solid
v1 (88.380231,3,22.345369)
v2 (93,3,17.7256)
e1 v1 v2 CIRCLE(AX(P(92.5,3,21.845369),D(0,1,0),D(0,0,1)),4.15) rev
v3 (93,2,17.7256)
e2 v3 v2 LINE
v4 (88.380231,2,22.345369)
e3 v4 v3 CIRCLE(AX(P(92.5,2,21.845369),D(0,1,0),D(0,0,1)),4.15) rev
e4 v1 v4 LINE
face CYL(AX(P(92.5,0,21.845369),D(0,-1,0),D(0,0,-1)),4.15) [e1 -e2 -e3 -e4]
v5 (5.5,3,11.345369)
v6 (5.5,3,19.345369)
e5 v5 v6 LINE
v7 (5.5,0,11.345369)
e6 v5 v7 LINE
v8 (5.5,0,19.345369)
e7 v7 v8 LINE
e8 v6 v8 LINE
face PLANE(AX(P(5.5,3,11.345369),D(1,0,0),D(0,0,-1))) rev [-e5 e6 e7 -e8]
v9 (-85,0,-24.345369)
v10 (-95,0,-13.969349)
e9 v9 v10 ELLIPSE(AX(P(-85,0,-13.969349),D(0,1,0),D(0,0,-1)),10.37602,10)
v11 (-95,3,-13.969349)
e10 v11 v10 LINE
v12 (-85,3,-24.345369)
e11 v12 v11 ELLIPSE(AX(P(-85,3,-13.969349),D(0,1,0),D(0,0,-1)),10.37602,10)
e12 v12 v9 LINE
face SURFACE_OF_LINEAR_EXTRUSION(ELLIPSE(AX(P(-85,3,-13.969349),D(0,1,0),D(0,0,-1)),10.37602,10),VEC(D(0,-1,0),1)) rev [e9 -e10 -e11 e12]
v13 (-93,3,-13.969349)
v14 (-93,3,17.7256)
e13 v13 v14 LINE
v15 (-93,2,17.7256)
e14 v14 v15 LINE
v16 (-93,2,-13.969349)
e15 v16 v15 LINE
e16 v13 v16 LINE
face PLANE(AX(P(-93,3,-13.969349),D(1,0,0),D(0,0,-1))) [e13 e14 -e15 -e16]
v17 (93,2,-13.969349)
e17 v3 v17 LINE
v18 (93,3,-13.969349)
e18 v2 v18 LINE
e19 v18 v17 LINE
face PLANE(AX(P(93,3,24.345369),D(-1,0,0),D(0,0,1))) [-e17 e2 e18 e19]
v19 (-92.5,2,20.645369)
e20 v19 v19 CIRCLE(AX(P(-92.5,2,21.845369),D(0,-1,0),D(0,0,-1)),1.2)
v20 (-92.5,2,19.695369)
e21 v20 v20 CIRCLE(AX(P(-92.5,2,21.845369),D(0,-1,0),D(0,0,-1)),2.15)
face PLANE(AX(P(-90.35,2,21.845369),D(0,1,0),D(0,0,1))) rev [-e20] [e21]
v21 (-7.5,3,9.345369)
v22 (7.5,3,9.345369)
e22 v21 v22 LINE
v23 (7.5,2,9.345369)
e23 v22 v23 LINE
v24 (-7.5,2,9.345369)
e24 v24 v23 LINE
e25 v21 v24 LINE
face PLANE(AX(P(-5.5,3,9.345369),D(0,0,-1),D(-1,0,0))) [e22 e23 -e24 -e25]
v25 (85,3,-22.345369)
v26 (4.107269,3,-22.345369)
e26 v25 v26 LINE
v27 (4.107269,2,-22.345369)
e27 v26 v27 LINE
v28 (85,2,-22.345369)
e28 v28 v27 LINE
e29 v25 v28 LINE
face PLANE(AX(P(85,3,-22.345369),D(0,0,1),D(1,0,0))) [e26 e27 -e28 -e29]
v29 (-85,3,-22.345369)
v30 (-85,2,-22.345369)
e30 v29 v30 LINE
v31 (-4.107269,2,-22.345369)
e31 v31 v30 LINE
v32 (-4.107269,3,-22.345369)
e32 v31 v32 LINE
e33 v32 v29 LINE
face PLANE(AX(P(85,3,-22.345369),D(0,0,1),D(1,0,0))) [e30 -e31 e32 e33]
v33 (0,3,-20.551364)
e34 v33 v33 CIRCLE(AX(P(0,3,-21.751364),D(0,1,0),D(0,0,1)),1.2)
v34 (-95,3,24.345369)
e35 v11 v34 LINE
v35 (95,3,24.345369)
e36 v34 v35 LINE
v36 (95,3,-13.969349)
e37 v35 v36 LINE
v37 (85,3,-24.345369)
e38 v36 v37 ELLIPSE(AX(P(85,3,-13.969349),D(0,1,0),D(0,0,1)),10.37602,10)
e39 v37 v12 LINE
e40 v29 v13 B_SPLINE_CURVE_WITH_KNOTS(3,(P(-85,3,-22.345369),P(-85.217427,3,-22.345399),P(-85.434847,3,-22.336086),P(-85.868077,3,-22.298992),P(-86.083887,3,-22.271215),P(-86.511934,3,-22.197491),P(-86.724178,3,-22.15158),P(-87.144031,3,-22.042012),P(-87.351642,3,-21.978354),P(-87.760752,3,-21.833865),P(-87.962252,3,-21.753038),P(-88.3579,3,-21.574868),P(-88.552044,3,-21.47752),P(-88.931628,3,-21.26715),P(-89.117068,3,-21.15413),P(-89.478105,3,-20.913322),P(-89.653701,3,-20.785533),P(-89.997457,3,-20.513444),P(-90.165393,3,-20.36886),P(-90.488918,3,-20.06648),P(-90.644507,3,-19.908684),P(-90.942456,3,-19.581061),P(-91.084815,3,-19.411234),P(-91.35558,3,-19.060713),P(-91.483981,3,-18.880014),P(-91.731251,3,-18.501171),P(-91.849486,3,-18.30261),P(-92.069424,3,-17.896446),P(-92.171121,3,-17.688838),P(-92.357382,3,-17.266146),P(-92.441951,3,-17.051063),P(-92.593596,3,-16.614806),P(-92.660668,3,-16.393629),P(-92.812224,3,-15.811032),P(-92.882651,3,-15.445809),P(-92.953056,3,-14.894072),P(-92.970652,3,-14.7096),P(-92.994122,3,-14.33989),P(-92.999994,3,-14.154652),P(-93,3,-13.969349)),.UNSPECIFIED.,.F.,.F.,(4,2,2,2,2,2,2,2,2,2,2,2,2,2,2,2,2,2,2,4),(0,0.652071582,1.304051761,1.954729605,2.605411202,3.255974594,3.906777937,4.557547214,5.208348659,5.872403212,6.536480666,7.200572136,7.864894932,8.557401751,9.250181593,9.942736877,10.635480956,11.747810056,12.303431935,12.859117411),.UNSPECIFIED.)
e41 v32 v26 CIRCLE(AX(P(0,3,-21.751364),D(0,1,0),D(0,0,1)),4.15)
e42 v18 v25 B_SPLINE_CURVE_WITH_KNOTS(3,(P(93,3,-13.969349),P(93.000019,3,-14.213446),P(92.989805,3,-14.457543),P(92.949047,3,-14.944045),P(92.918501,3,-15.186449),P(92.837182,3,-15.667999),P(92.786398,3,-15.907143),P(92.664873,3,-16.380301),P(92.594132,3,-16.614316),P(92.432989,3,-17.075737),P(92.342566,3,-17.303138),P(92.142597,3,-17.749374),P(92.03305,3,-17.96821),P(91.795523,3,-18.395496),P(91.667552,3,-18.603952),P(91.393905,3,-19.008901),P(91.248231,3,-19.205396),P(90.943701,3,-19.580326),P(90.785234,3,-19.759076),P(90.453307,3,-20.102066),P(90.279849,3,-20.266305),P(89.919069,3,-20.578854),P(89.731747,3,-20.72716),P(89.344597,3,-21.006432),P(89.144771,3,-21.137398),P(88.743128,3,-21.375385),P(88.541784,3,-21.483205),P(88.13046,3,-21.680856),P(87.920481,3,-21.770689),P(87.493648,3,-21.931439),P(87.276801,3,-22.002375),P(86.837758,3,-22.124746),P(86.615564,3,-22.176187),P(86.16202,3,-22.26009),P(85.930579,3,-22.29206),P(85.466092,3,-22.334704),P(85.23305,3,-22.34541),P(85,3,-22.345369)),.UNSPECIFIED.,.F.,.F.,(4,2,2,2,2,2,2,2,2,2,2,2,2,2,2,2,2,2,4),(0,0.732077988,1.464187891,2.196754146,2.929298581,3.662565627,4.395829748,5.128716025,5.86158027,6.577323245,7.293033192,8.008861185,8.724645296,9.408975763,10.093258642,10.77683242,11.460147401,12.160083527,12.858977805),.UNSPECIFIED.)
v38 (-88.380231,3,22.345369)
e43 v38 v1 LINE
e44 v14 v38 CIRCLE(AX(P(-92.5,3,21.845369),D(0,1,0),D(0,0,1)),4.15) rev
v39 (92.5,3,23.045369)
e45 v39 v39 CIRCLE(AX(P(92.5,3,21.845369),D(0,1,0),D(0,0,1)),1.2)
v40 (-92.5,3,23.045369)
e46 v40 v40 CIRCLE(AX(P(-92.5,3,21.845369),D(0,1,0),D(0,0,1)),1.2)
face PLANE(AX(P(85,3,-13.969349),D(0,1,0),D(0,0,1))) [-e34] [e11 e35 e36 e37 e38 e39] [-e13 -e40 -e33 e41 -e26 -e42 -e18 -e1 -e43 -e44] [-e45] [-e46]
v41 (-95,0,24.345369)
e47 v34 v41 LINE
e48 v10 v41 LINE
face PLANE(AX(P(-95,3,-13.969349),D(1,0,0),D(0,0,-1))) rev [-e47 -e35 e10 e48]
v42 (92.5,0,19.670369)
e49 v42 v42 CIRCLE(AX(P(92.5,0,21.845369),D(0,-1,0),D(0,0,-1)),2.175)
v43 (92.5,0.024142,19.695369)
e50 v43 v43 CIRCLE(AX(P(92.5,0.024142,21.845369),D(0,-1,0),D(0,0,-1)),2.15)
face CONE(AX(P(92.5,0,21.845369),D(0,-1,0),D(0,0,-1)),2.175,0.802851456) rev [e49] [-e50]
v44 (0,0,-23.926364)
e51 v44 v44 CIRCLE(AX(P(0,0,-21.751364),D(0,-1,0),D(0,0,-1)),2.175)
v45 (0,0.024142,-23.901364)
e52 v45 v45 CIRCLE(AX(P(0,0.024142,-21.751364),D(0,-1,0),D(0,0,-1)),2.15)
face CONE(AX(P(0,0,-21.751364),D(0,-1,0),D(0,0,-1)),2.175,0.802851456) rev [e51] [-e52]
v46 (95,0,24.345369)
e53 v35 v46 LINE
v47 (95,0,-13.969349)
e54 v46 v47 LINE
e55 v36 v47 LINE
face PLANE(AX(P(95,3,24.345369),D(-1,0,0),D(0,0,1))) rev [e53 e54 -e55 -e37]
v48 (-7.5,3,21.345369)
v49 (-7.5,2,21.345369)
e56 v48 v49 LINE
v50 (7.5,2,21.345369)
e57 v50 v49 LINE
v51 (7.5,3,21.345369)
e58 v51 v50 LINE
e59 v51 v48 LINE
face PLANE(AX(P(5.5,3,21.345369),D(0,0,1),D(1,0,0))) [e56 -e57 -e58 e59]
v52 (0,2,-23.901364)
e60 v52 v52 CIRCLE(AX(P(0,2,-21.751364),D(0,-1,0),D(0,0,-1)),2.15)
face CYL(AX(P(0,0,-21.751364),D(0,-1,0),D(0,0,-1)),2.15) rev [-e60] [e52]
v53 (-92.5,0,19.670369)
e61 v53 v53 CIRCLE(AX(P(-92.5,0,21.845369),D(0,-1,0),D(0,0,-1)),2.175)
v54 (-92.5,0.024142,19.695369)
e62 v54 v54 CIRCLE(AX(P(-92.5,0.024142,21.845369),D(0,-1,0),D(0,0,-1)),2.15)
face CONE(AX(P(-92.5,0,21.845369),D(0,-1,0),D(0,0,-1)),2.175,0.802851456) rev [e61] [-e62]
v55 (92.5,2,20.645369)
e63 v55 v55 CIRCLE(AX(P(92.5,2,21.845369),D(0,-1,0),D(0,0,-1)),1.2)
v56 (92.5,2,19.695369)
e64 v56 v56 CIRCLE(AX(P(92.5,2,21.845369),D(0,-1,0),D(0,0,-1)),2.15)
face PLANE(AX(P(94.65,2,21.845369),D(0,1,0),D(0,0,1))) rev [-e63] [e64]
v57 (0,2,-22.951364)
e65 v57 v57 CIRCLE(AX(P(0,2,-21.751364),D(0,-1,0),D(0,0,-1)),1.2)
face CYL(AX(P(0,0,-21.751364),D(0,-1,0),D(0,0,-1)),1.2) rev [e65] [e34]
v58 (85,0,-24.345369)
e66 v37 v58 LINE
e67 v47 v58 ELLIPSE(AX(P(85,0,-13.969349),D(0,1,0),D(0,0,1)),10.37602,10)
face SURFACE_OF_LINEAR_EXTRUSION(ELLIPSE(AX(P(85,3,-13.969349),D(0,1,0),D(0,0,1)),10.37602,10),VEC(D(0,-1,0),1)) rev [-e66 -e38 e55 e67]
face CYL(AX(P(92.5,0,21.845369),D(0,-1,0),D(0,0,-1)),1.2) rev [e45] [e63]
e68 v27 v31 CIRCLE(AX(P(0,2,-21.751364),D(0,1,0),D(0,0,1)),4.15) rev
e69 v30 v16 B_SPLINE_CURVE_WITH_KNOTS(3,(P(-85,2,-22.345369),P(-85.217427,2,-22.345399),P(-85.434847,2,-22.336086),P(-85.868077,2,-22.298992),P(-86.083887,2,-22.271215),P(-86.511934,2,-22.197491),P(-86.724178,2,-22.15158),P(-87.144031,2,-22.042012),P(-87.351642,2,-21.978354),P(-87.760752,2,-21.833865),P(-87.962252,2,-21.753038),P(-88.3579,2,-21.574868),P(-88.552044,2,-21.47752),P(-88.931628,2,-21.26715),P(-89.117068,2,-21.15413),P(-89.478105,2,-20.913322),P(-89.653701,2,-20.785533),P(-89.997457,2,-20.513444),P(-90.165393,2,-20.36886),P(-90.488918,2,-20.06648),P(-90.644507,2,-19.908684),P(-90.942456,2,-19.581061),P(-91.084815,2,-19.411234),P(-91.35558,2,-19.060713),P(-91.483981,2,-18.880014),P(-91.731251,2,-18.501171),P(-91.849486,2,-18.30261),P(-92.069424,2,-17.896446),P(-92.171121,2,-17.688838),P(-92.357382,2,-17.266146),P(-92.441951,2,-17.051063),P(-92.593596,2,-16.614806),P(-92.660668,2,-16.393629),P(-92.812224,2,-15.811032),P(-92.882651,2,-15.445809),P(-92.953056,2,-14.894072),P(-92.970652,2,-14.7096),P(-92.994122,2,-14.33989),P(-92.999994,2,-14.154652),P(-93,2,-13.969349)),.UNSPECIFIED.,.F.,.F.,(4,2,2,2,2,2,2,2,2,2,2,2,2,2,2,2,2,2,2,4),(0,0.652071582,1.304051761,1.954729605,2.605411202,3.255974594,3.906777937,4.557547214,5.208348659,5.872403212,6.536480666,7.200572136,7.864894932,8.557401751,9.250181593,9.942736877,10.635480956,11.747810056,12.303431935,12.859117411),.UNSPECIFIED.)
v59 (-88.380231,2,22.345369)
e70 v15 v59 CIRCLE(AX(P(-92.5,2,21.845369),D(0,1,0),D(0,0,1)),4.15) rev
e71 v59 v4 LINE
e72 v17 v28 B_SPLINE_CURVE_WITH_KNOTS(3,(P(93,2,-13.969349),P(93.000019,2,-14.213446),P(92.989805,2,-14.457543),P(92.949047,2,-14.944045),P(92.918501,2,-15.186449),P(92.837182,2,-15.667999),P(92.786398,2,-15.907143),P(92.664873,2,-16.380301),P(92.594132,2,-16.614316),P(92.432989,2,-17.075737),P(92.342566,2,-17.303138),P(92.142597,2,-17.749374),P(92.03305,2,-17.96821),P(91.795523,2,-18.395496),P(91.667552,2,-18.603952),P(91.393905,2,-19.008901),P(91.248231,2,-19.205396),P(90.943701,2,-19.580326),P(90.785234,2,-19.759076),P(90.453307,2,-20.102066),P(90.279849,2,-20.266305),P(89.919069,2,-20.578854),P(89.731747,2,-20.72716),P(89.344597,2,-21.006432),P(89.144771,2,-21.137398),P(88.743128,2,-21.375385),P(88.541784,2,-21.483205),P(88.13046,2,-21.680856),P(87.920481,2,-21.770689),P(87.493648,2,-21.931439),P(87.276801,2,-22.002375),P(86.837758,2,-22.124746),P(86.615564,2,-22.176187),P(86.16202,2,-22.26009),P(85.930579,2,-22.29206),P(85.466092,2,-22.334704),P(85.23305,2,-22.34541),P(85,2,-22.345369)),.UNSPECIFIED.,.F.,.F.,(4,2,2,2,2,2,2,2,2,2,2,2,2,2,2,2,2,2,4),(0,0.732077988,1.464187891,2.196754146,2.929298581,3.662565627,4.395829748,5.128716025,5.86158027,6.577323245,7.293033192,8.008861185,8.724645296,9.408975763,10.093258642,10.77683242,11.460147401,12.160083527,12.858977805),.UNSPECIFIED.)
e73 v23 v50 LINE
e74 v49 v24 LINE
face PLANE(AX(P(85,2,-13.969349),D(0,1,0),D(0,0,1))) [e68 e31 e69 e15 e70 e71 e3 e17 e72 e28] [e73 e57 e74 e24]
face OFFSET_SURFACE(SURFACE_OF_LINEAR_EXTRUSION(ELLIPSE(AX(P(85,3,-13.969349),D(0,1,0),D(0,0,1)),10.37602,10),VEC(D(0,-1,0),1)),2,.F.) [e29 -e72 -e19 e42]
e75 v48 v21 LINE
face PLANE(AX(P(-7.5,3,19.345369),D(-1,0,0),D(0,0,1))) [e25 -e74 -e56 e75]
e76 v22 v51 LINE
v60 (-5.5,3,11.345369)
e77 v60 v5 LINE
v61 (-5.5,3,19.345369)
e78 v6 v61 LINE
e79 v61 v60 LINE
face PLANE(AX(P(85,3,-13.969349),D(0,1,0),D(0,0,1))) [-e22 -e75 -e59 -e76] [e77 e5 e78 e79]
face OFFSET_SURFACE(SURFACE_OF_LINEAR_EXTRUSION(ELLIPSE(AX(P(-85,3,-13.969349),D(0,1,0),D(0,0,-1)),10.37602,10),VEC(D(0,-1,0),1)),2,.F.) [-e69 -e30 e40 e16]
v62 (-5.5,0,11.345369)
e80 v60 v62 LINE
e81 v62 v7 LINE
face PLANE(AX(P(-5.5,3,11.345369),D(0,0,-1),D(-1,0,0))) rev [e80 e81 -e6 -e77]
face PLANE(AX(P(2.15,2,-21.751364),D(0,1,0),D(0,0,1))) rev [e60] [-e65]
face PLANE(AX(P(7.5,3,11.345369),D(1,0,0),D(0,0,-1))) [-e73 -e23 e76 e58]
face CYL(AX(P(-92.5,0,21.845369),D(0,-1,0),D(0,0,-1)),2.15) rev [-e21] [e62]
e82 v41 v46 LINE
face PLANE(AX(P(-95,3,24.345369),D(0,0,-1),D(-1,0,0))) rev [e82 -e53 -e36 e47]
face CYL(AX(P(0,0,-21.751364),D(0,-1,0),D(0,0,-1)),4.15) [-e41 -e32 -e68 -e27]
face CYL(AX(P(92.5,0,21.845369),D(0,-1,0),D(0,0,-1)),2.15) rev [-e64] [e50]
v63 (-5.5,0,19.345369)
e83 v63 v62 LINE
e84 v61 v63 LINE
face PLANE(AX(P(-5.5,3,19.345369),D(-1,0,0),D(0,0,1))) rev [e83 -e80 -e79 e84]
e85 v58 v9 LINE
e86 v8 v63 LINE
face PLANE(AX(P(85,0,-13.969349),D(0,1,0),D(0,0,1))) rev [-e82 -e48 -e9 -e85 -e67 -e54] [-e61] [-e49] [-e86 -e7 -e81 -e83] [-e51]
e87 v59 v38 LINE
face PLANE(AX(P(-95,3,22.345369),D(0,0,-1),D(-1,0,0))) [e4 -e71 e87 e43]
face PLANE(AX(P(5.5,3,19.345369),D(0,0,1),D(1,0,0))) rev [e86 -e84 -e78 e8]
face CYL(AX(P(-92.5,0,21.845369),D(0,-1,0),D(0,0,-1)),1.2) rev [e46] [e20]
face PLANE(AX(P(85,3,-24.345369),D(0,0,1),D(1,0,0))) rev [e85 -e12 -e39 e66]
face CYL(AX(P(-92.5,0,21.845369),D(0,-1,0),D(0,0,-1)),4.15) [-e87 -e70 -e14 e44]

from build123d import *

# Parameters (mm, degrees)
EXTRUDE_2_DEPTH          = 3
HOLE_WIZARD_6_AT_2_COUNT = 2
HOLE_WIZARD_6_AT_2_PITCH = 102.259107828
HOLE_WIZARD_6_AT_3_COUNT = 2
HOLE_WIZARD_6_AT_3_PITCH = 185
SKETCH_15_W              = 11
SKETCH_15_H              = 8
CUT_EXTRUDE_1_DEPTH      = 99.115732766
SHELL_START              = 2
SHELL_3_OUTLINE_W        = 15
SHELL_3_OUTLINE_H        = 12
SHELL_3_DEPTH            = 1


# Read off the part's stored shape, not the designer's step: 抽壳3
with BuildPart() as part:
    # 草图1 → 凸台-拉伸2 (new body)
    with BuildSketch(Plane(origin=(0, 0, 0), x_dir=(1, 0, 0), z_dir=(0, 1, 0))):
        with BuildLine():
            Line((85, 24.345368999), (-85, 24.345368999))
            add(Edge.make_bspline(
                [(-85, 24.345368999), (-95, 24.345368999), (-95, 13.969349259)],
                knots=[0, 0, 0, 1.570796327, 1.570796327, 1.570796327], degree=2, weights=[1, 0.707106781, 1]))
            Line((-95, 13.969349259), (-95, -24.345368999))
            Line((-95, -24.345368999), (95, -24.345368999))
            Line((95, -24.345368999), (95, 13.969349259))
            add(Edge.make_bspline(
                [(95, 13.969349259), (95, 24.345368999), (85, 24.345368999)],
                knots=[1.570796327, 1.570796327, 1.570796327, 3.141592654, 3.141592654, 3.141592654], degree=2, weights=[1, 0.707106781, 1]))
        make_face()
    extrude(amount=EXTRUDE_2_DEPTH)

    # 草图14 → 大小六角凹头盖螺钉柱孔6 (revolve, cut)
    with BuildSketch(Plane(origin=(92.5, 0, 21.845368999), x_dir=(0, 0, -1), z_dir=(1, 0, 0))):
        Polygon((0, 0), (0, 3), (1.2, 3), (1.2, 2), (2.15, 2), (2.15, 0.024142219), (2.175, 0), align=None)
    hole_wizard_6 = revolve(axis=Axis((92.5, -6.35, 21.845368999), (0, 1, 0)), mode=Mode.SUBTRACT)

    # 大小六角凹头盖螺钉柱孔6 at 2: 大小六角凹头盖螺钉柱孔6 ×2
    with Locations(*[Vector(-0.9045649034602262, 0, -0.42633594198471203) * (i * HOLE_WIZARD_6_AT_2_PITCH) for i in range(1, HOLE_WIZARD_6_AT_2_COUNT)]):
        add(hole_wizard_6, mode=Mode.SUBTRACT)

    # 大小六角凹头盖螺钉柱孔6 at 3: 大小六角凹头盖螺钉柱孔6 ×2
    with Locations(*[(-i * HOLE_WIZARD_6_AT_3_PITCH, 0, 0) for i in range(1, HOLE_WIZARD_6_AT_3_COUNT)]):
        add(hole_wizard_6, mode=Mode.SUBTRACT)

    # 草图15 → 切除-拉伸1 (cut, through all)
    with BuildSketch(Plane.XZ):
        with Locations((0, 15.345368999)):
            Rectangle(SKETCH_15_W, SKETCH_15_H)
    extrude(amount=-CUT_EXTRUDE_1_DEPTH, mode=Mode.SUBTRACT)

    # 抽壳3 outline → 抽壳3 (cut)
    with BuildSketch(Plane(origin=(0, 0, 0), x_dir=(1, 0, 0), z_dir=(0, 1, 0)).offset(SHELL_START)):
        with BuildLine():
            Line((93, -17.725599588), (93.000000196, 13.969349259))
            add(Edge.make_bspline(
                [(93.000000196, 13.969349259), (93.000000196, 14.990185456), (92.871215367, 16.011021653), (92.613645709, 17.01184643), (92.230602513, 17.972648367), (91.728708361, 18.874166906), (91.117678233, 19.698643208), (90.409881727, 20.430484444), (89.619725312, 21.056754945), (88.762932516, 21.567410906), (87.855861705, 21.955201909), (86.915108734, 22.215310689), (85.957556964, 22.345368999), (85, 22.345368999)],
                knots=[1.570796327, 1.570796327, 1.570796327, 1.570796327, 1.570796327, 1.570796327, 1.570796327, 1.570796327, 1.570796327, 1.570796327, 1.570796327, 1.570796327, 1.570796327, 1.570796327, 3.141592654, 3.141592654, 3.141592654, 3.141592654, 3.141592654, 3.141592654, 3.141592654, 3.141592654, 3.141592654, 3.141592654, 3.141592654, 3.141592654, 3.141592654, 3.141592654], degree=13))
            Line((85, 22.345368999), (4.107268939, 22.345368999))
            ThreePointArc((4.107268939, 22.345368999), (0, 17.601364064), (-4.107268939, 22.345368999))
            Line((-4.107268939, 22.345368999), (-85, 22.345368999))
            add(Edge.make_bspline(
                [(-85, 22.345368999), (-85.957556964, 22.345368999), (-86.915108734, 22.215310689), (-87.855861705, 21.955201909), (-88.762932516, 21.567410906), (-89.619725312, 21.056754945), (-90.409881727, 20.430484444), (-91.117678233, 19.698643208), (-91.728708361, 18.874166906), (-92.230602513, 17.972648367), (-92.613645709, 17.01184643), (-92.871215367, 16.011021653), (-93.000000196, 14.990185456), (-93.000000196, 13.969349259)],
                knots=[0, 0, 0, 0, 0, 0, 0, 0, 0, 0, 0, 0, 0, 0, 1.570796327, 1.570796327, 1.570796327, 1.570796327, 1.570796327, 1.570796327, 1.570796327, 1.570796327, 1.570796327, 1.570796327, 1.570796327, 1.570796327, 1.570796327, 1.570796327], degree=13))
            Line((-93.000000196, 13.969349259), (-93, -17.725599588))
            ThreePointArc((-93, -17.725599588), (-89.565506858, -18.910875857), (-88.380230589, -22.345368999))
            Line((-88.380230589, -22.345368999), (88.380230589, -22.345368999))
            ThreePointArc((88.380230589, -22.345368999), (89.565506858, -18.910875857), (93, -17.725599588))
        make_face()
        with Locations((0, -15.345368999)):
            Rectangle(SHELL_3_OUTLINE_W, SHELL_3_OUTLINE_H, mode=Mode.SUBTRACT)
    extrude(amount=SHELL_3_DEPTH, mode=Mode.SUBTRACT)


solid = part.part
